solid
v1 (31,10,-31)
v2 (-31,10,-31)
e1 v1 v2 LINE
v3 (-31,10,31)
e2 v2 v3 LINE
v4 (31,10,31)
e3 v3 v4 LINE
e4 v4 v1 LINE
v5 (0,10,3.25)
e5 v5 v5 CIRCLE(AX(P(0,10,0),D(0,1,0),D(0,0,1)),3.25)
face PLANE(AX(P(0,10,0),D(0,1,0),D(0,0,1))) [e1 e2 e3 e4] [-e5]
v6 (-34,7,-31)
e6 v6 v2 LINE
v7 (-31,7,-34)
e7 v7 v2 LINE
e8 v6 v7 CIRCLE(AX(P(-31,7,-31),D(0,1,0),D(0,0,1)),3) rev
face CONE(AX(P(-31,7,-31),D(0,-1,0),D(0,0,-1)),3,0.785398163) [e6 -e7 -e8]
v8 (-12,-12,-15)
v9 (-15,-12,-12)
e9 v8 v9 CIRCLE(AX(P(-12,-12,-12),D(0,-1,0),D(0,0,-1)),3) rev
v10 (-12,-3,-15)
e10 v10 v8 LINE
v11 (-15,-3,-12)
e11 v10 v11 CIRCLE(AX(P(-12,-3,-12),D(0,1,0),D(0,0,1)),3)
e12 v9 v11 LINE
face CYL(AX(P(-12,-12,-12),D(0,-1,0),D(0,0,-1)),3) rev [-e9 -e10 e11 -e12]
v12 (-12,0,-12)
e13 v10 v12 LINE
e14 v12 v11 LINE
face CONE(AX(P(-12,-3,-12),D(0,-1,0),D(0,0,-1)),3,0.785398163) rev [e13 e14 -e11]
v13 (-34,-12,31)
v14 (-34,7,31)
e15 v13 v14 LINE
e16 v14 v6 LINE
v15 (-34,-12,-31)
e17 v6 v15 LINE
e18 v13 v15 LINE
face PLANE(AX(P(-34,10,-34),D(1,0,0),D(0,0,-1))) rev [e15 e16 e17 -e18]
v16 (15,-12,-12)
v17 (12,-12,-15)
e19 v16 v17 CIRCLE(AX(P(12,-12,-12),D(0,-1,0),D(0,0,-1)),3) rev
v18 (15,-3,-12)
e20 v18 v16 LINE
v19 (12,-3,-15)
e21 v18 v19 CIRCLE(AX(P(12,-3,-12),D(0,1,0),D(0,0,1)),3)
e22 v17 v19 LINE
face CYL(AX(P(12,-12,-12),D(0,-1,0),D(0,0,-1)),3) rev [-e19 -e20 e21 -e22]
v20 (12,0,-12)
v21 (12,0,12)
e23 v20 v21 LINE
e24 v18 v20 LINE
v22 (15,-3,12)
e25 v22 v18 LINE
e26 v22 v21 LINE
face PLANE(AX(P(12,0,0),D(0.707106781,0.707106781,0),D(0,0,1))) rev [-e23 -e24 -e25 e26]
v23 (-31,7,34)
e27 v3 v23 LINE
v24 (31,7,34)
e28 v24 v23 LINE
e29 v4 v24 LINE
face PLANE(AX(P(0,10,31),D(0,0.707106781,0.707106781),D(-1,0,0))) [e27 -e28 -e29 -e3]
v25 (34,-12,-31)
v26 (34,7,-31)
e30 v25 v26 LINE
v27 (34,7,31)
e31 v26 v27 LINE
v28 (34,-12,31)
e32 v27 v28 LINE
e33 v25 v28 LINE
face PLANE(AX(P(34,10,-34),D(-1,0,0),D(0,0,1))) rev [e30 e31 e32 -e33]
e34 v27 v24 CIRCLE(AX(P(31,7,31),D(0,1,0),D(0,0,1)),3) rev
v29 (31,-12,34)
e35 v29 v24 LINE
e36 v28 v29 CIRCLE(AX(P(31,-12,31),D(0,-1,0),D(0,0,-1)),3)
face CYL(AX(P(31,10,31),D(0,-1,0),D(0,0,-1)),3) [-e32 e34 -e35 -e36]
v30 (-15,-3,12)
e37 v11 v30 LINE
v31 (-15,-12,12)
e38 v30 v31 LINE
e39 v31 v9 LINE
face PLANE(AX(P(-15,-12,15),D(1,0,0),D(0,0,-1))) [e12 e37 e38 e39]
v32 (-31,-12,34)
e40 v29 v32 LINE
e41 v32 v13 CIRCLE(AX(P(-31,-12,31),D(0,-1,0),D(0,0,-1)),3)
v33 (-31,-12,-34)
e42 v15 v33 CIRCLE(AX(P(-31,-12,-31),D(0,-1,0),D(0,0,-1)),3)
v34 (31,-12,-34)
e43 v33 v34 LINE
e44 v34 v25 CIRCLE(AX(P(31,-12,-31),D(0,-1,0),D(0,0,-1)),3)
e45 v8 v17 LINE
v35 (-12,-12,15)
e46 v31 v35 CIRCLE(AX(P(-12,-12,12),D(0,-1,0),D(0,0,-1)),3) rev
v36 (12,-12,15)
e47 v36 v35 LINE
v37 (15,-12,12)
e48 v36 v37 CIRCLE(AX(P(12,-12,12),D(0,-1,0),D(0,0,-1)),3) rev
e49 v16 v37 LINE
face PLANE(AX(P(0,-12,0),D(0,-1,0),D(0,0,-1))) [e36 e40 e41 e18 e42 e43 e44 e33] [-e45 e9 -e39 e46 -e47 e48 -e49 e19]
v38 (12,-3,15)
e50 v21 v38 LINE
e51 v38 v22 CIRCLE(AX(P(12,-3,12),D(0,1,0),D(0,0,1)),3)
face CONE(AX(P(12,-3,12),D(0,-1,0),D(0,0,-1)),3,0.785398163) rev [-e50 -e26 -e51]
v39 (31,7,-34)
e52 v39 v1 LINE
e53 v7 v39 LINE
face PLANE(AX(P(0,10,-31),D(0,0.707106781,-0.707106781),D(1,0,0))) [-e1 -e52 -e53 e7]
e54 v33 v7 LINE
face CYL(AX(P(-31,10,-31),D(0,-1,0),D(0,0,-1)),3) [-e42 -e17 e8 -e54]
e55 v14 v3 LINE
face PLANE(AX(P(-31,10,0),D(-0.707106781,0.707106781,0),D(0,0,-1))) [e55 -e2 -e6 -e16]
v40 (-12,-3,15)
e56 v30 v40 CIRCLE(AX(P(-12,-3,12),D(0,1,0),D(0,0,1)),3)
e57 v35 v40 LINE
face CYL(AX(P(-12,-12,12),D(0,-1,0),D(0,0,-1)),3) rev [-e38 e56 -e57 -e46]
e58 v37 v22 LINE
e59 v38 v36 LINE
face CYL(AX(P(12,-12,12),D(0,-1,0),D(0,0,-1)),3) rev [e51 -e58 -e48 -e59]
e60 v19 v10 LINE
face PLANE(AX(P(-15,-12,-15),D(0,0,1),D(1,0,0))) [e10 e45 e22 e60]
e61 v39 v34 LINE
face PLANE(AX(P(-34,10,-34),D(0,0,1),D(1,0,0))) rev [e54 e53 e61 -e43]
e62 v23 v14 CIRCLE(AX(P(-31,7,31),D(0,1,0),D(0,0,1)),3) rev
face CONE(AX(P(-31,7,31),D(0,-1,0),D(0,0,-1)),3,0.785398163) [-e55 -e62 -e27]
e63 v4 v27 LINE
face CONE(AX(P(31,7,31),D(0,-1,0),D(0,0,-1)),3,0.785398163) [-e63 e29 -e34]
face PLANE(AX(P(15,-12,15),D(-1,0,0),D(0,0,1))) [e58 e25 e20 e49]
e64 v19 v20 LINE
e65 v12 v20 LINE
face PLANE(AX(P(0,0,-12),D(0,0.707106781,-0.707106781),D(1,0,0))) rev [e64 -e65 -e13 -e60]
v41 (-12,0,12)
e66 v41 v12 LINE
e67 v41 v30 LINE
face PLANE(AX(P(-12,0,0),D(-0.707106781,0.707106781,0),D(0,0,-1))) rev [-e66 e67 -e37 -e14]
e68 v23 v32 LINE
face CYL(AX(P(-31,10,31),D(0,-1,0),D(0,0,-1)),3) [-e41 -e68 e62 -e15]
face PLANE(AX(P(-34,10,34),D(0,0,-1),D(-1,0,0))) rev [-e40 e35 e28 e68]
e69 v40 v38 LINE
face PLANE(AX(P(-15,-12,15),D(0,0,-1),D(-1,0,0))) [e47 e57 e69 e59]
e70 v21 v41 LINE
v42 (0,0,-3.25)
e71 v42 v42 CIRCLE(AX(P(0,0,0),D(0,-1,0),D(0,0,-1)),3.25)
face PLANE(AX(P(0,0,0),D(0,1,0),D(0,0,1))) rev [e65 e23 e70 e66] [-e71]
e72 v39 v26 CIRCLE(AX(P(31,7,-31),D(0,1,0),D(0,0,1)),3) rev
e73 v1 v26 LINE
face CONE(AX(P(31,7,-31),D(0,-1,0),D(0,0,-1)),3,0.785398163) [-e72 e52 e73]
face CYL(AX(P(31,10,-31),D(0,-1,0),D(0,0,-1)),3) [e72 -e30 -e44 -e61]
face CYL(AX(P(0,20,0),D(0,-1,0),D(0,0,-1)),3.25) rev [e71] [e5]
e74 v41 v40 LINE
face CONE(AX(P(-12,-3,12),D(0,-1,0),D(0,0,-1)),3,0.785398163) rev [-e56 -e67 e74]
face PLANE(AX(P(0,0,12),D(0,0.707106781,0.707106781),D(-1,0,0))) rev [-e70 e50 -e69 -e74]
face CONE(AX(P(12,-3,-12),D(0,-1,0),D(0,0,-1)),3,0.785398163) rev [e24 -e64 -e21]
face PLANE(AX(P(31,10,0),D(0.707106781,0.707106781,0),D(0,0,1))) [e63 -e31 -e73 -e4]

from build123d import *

# Parameters (mm, degrees)
SKETCH1_W           = 68
SKETCH1_H           = 68
BOSS_EXTRUDE1_DEPTH = 10
SKETCH4_W           = 68
SKETCH4_H           = 68
SKETCH4_W_2         = 30
SKETCH4_H_2         = 30
BOSS_EXTRUDE3_DEPTH = 12
FILLET2_R           = 3
FILLET3_R           = 3
SKETCH5_R           = 3.25
CUT_EXTRUDE2_DEPTH  = 20
CHAMFER1_SIZE       = 3
CHAMFER2_SIZE       = 3


with BuildPart() as part:
    # Sketch1 → Boss-Extrude1 (new body)
    with BuildSketch(Plane(origin=(0, 0, 0), x_dir=(1, 0, 0), z_dir=(0, 1, 0))):
        Rectangle(SKETCH1_W, SKETCH1_H)
    extrude(amount=BOSS_EXTRUDE1_DEPTH)

    # Sketch4 → Boss-Extrude3 (add)
    with BuildSketch(Plane.XZ):
        Rectangle(SKETCH4_W, SKETCH4_H)
        Rectangle(SKETCH4_W_2, SKETCH4_H_2, mode=Mode.SUBTRACT)
    extrude(amount=BOSS_EXTRUDE3_DEPTH)

    # Fillet2
    fillet2_edges = [part.edges().sort_by_distance(p)[0] for p in [
        (34, -1, 34),
        (-34, -1, 34),
        (-34, -1, -34),
        (34, -1, -34),
    ]]
    fillet(fillet2_edges, radius=FILLET2_R)

    # Fillet3
    fillet3_edges = [part.edges().sort_by_distance(p)[0] for p in [
        (15, -6, 15),
        (-15, -6, 15),
        (-15, -6, -15),
        (15, -6, -15),
    ]]
    fillet(fillet3_edges, radius=FILLET3_R)

    # Sketch5 → Cut-Extrude2 (cut)
    with BuildSketch(Plane.XZ):
        with Locations(Location((0, 0, 0), (0, 0, 270))):
            Circle(SKETCH5_R)
    extrude(amount=-CUT_EXTRUDE2_DEPTH, mode=Mode.SUBTRACT)

    # Chamfer1
    chamfer1_edges = [part.edges().sort_by_distance(p)[0] for p in [
        (34, 10, 0),
        (0, 10, 34),
        (0, 10, -34),
        (-34, 10, 0),
        (-33.121320344, 10, -33.121320344),
        (33.121320344, 10, -33.121320344),
        (-33.121320344, 10, 33.121320344),
        (33.121320344, 10, 33.121320344),
    ]]
    chamfer(chamfer1_edges, length=CHAMFER1_SIZE - 0.0001)  # a hair under: the kernel refuses the full size

    # Chamfer2
    chamfer2_edges = [part.edges().sort_by_distance(p)[0] for p in [
        (0, 0, 15),
        (0, 0, -15),
        (15, 0, 0),
        (-15, 0, 0),
        (14.121320344, 0, 14.121320344),
        (14.121320344, 0, -14.121320344),
        (-14.121320344, 0, -14.121320344),
        (-14.121320344, 0, 14.121320344),
    ]]
    chamfer(chamfer2_edges, length=CHAMFER2_SIZE - 0.0001)  # a hair under: the kernel refuses the full size


solid = part.part
